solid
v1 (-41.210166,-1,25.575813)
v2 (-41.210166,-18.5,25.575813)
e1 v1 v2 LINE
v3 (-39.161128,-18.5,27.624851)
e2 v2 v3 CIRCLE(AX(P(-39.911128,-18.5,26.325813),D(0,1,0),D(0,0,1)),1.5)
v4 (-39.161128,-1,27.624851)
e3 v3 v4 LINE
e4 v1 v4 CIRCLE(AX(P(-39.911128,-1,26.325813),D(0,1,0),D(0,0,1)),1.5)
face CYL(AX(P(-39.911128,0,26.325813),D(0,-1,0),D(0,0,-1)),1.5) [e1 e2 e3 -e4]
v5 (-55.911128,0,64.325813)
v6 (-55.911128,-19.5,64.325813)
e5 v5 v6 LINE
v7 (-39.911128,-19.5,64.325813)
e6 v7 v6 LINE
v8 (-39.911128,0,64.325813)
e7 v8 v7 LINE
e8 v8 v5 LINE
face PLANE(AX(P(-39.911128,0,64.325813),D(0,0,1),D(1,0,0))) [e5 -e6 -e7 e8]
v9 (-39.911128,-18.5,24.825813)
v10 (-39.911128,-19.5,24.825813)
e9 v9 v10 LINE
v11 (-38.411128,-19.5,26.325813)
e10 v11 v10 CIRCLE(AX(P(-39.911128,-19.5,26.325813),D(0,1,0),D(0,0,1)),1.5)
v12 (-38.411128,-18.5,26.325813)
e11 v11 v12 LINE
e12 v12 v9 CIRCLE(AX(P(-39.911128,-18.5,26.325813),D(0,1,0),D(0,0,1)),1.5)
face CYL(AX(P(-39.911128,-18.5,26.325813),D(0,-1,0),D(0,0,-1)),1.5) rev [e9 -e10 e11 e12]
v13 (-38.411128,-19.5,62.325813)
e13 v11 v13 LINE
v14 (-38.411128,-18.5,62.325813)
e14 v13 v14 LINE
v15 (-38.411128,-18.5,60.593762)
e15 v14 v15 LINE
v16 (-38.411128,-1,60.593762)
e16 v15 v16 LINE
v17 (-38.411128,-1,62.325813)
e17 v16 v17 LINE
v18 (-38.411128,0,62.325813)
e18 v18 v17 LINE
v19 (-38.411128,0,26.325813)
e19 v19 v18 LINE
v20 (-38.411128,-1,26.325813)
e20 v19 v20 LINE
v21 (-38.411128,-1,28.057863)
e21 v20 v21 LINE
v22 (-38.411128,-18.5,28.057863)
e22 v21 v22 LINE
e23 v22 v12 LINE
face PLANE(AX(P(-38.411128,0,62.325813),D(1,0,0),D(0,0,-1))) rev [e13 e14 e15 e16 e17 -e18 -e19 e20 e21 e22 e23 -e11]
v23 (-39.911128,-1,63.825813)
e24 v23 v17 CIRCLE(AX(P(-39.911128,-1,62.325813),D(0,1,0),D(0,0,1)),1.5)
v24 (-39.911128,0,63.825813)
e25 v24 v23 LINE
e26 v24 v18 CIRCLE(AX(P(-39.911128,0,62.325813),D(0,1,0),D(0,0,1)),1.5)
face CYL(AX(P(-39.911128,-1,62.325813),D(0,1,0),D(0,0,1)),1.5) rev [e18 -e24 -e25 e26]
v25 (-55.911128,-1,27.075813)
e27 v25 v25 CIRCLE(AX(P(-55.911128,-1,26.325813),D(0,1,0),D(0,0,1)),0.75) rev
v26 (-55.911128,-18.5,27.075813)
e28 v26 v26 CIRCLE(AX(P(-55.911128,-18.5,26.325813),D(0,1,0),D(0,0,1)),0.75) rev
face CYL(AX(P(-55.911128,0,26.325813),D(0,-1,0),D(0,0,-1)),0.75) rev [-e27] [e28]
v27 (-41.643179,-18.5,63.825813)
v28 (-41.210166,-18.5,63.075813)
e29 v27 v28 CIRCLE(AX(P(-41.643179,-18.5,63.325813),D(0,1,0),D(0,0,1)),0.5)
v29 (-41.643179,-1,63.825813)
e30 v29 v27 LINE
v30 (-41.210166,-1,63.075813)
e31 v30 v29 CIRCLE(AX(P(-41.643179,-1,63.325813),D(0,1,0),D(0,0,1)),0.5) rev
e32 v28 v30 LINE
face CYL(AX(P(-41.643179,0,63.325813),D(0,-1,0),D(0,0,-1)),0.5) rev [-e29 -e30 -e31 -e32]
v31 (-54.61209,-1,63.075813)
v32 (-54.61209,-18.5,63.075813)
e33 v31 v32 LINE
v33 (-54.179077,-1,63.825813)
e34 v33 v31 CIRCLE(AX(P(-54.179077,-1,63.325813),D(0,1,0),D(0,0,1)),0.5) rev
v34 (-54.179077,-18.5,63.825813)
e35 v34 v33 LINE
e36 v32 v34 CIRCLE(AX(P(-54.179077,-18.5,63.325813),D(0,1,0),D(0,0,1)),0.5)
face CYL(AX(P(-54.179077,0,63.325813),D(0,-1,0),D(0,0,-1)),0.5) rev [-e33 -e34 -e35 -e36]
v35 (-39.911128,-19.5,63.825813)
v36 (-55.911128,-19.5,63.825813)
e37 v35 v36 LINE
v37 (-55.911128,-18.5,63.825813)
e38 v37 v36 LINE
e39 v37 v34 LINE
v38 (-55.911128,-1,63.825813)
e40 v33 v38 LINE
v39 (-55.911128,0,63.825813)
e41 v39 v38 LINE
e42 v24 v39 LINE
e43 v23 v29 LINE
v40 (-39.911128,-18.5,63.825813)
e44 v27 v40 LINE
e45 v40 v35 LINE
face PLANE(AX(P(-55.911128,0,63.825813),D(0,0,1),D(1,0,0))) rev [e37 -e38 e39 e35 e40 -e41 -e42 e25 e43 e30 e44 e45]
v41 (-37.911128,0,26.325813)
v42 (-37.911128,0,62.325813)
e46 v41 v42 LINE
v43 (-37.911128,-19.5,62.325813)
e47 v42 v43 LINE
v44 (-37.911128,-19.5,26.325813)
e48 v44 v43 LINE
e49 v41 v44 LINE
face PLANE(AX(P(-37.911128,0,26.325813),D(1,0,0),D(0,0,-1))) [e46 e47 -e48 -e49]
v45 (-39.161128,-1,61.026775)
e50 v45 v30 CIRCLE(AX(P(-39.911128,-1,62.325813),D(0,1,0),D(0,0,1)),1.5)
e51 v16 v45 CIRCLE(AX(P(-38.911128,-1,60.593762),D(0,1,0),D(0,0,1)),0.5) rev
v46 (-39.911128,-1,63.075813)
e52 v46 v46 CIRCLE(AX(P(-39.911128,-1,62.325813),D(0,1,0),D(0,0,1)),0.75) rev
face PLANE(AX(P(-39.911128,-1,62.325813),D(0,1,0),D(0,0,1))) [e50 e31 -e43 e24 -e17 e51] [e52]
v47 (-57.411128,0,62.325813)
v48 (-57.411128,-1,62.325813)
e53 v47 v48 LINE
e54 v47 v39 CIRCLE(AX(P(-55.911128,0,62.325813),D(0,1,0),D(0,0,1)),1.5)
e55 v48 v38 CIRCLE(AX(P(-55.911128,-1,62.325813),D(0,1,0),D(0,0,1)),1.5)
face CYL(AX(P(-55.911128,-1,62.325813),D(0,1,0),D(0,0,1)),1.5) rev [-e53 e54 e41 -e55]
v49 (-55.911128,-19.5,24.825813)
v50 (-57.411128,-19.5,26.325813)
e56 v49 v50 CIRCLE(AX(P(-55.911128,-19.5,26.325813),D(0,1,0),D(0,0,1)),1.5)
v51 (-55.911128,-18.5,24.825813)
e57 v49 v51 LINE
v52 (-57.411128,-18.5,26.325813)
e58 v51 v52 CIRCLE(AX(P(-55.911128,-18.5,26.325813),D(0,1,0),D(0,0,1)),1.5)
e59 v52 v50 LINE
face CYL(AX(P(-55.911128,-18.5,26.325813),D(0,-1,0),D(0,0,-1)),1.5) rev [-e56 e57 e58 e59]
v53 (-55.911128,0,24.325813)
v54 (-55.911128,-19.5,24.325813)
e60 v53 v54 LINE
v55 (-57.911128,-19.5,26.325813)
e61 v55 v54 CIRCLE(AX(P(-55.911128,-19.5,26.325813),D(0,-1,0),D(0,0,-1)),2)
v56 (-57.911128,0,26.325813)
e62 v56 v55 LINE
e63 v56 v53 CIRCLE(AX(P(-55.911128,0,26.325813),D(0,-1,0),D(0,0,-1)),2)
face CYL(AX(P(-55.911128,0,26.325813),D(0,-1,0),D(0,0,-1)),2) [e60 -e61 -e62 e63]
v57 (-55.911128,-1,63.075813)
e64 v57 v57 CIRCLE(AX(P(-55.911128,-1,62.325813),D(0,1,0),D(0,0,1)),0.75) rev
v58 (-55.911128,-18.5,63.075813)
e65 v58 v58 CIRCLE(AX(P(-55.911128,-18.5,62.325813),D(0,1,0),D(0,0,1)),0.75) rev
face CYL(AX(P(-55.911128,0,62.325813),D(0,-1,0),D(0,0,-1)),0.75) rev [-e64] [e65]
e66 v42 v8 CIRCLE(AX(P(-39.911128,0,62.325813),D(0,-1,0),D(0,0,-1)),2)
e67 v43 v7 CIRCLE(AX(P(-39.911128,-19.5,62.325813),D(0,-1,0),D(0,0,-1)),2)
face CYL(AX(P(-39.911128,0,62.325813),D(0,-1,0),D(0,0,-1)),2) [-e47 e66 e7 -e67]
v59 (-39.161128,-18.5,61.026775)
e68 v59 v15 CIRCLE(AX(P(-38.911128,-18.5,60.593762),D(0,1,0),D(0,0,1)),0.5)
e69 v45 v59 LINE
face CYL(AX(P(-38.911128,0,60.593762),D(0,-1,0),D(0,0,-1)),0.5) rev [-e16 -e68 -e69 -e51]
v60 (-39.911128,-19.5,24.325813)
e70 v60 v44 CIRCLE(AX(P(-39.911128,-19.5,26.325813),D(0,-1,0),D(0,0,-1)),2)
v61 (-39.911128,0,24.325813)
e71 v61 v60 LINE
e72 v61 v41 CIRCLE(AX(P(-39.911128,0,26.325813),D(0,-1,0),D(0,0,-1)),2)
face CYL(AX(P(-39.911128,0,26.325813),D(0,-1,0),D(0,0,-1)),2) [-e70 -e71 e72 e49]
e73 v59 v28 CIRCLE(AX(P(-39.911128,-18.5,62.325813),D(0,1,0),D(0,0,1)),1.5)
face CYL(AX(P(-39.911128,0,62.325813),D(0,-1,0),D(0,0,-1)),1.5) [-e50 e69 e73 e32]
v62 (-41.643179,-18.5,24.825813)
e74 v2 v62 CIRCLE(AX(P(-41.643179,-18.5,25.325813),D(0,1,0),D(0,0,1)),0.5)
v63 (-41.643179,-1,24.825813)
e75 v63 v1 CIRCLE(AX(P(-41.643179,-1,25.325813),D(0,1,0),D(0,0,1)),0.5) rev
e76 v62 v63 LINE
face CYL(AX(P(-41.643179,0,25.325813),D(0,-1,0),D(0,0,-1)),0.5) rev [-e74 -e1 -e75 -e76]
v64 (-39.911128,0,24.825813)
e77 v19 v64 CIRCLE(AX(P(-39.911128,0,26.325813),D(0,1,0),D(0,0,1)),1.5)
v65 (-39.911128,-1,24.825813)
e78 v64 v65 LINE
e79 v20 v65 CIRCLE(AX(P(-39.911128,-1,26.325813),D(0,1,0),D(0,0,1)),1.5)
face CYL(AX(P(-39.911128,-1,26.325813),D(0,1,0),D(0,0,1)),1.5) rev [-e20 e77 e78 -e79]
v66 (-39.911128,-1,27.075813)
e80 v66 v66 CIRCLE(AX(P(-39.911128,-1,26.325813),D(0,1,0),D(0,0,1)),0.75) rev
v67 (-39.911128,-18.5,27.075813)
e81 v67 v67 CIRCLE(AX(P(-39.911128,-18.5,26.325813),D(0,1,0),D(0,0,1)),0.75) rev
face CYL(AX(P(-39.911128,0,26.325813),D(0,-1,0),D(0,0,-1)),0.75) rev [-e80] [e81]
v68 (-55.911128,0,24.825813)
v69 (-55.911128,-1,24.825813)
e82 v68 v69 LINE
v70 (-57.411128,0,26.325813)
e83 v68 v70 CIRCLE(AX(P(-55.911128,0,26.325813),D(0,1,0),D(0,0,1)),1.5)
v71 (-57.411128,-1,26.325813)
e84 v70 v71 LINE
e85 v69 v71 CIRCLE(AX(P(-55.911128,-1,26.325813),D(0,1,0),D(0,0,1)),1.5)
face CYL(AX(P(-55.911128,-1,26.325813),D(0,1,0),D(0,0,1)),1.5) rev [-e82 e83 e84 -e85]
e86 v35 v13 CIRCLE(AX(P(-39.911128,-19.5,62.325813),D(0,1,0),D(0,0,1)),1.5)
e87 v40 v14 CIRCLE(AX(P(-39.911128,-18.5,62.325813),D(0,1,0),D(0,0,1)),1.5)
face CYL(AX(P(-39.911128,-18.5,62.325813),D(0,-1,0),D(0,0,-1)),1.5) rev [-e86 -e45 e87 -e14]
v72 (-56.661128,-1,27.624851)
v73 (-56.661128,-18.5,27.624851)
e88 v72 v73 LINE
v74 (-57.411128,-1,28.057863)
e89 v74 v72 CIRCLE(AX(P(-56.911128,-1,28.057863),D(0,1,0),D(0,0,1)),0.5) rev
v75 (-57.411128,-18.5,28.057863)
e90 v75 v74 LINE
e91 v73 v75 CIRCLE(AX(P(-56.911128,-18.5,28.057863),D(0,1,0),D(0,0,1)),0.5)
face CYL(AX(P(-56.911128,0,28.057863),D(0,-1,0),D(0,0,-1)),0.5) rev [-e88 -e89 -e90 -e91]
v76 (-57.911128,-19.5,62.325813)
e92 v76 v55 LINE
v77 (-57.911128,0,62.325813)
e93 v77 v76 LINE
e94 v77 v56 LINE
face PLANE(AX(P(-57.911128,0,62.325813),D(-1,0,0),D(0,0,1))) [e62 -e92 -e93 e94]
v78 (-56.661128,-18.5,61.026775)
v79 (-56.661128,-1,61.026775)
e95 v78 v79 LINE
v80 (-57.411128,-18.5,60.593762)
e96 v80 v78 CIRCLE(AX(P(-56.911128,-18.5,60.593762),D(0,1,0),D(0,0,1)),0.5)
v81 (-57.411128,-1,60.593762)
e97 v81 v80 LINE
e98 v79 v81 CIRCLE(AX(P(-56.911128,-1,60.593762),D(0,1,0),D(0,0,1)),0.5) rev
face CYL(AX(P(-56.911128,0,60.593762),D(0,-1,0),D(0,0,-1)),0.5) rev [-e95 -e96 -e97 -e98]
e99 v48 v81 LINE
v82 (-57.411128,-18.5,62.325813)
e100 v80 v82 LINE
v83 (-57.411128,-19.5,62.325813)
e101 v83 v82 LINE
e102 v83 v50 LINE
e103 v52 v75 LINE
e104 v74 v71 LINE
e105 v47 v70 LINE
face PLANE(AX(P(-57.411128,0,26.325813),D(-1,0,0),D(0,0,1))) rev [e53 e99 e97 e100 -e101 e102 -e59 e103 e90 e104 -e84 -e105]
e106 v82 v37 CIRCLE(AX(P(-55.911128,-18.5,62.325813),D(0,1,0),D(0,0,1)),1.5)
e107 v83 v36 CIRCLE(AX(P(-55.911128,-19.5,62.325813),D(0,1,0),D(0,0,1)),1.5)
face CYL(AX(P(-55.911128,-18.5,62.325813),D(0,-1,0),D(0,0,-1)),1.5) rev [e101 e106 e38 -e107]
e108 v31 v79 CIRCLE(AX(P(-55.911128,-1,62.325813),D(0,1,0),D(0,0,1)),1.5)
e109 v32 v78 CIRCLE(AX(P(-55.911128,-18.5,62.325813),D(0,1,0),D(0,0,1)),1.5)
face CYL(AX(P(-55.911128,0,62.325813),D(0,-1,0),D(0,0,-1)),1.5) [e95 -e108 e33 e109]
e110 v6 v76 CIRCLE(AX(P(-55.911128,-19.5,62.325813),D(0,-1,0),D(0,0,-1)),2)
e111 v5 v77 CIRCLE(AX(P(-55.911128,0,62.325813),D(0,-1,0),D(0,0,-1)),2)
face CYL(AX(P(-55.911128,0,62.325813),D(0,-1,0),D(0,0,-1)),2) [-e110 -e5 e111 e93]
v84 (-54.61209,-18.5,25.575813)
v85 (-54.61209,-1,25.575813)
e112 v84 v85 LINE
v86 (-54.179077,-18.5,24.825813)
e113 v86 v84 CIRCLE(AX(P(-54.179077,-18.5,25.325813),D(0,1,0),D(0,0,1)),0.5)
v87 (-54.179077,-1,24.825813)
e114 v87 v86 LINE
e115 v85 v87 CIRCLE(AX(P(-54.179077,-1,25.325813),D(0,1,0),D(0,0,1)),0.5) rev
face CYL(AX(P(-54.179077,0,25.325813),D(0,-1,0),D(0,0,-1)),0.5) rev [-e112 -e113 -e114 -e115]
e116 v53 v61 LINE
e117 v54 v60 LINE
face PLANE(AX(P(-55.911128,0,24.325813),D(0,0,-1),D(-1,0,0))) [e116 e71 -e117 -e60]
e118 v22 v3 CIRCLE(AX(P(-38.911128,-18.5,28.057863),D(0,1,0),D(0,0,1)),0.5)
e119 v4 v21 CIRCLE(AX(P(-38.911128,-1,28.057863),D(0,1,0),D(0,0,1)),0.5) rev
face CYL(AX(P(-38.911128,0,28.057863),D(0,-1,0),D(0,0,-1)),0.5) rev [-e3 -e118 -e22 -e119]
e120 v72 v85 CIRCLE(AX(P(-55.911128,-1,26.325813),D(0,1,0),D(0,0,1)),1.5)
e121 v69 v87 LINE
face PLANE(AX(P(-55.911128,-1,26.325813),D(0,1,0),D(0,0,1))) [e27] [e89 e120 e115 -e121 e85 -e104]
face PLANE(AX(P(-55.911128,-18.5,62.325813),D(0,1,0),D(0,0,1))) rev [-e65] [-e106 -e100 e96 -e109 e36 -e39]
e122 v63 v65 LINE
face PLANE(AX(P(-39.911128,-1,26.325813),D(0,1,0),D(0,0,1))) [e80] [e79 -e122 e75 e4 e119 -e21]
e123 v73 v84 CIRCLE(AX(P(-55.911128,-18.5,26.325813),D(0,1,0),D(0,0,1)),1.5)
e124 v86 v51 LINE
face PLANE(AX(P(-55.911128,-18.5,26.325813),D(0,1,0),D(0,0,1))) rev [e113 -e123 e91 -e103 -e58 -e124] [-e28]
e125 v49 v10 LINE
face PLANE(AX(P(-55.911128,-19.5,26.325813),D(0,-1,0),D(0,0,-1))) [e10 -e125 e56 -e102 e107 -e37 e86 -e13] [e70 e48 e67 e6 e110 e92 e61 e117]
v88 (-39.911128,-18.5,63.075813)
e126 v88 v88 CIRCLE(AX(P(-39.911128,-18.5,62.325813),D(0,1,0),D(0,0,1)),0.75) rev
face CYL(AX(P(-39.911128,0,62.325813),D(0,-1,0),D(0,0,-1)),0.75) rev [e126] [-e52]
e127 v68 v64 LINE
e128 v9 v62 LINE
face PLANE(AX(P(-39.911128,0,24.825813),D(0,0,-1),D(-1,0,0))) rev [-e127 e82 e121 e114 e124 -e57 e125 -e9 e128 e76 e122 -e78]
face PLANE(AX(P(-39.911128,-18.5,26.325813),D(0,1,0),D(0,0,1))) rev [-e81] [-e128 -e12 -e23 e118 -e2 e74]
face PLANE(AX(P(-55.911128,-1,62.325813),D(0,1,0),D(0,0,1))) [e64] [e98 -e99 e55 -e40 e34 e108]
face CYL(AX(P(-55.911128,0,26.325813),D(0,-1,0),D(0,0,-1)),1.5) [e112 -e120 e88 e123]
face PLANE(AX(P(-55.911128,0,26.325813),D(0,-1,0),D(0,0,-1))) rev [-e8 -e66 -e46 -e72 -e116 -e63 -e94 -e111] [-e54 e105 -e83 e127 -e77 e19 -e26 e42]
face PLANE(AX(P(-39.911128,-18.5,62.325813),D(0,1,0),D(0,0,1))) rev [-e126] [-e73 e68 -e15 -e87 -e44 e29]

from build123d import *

# Parameters (mm, degrees)
ESQUISSE1_R             = 0.7500000000000007
BOSS_EXTRU_1_DEPTH      = 19.5
ENL_V_START             = -1
ESQUISSE2_R             = 1.5000000000042053
ESQUISSE2_R_2           = 1.5000000000000118
ESQUISSE2_R_3           = 1.5000000000000042
ESQUISSE2_R_4           = 1.4999999999999973
ENL_V_MAT_EXTRU_1_DEPTH = 1
ENL_V_START_2           = -19.5
ESQUISSE2_2_R           = 1.5000000000042053
ESQUISSE2_2_R_2         = 1.5000000000000118
ESQUISSE2_2_R_3         = 1.5000000000000042
ESQUISSE2_2_R_4         = 1.4999999999999973
ENL_V_MAT_EXTRU_2_DEPTH = 1
CONG_1_R                = 0.5
CONG_2_START            = -18.5
CONG_2_DEPTH            = 17.5


with BuildPart() as part:
    # Esquisse1 → Boss.-Extru.1 (new body)
    with BuildSketch(Plane.XZ.offset(19.5)):
        with BuildLine():
            Line((-55.9111281070707, 24.325812619498315), (-39.91112810707456, 24.325812619498663))
            ThreePointArc((-39.91112810707456, 24.325812619498663), (-38.49691454470147, 24.911599057125567), (-37.91112810707456, 26.325812619498663))
            Line((-37.91112810707456, 26.325812619498663), (-37.91112810707456, 62.32581261950286))
            ThreePointArc((-37.91112810707456, 62.32581261950286), (-38.49691454470147, 63.740026181875955), (-39.91112810707456, 64.32581261950286))
            Line((-39.91112810707456, 64.32581261950286), (-55.91112810707387, 64.32581261950355))
            ThreePointArc((-55.91112810707387, 64.32581261950355), (-57.3253416694479, 63.74002618187669), (-57.91112810707526, 62.32581261950286))
            Line((-57.91112810707526, 62.32581261950286), (-57.91112810707456, 26.325812619502862))
            ThreePointArc((-57.91112810707456, 26.325812619502862), (-57.325341669446544, 24.911599057126917), (-55.9111281070707, 24.325812619498315))
        make_face()
        with Locations(Location((-39.91112810707456, 26.325812619498663, 0), (0, 0, 90))):
            Circle(ESQUISSE1_R, mode=Mode.SUBTRACT)
        with Locations(Location((-39.91112810707456, 62.32581261950286, 0), (0, 0, 90))):
            Circle(ESQUISSE1_R, mode=Mode.SUBTRACT)
        with Locations(Location((-55.91112810707456, 62.32581261950286, 0), (0, 0, 90))):
            Circle(ESQUISSE1_R, mode=Mode.SUBTRACT)
        with Locations(Location((-55.911128107070354, 26.325812619502862, 0), (0, 0, 90))):
            Circle(ESQUISSE1_R, mode=Mode.SUBTRACT)
        with BuildLine():
            Line((-38.41112810707456, 62.32581261950286), (-38.41112810707455, 26.325812619498663))
            ThreePointArc((-38.41112810707455, 26.325812619498663), (-40.97178827885439, 27.38647279127849), (-39.91112810707456, 24.825812619498656))
            Line((-39.91112810707456, 24.825812619498656), (-55.911128107070354, 24.825812619498652))
            ThreePointArc((-55.911128107070354, 24.825812619498652), (-54.850467935287554, 27.386472791285662), (-57.41112810707456, 26.325812619502862))
            Line((-57.41112810707456, 26.325812619502862), (-57.41112810707456, 62.32581261950286))
            ThreePointArc((-57.41112810707456, 62.32581261950286), (-54.85046793529474, 61.26515244772304), (-55.91112810707456, 63.82581261950286))
            Line((-55.91112810707456, 63.82581261950286), (-39.91112810707456, 63.82581261950286))
            ThreePointArc((-39.91112810707456, 63.82581261950286), (-40.97178827885438, 61.26515244772304), (-38.41112810707456, 62.32581261950286))
        make_face(mode=Mode.SUBTRACT)
    extrude(amount=-BOSS_EXTRU_1_DEPTH)

    # Esquisse2 → Enlèv. mat.-Extru.1 (cut)
    with BuildSketch(Plane(origin=(0, 0, 0), x_dir=(1, 0, 0), z_dir=(0, 1, 0)).offset(ENL_V_START)):
        with Locations((-55.911128107070354, -26.325812619502862)):
            Circle(ESQUISSE2_R)
        with Locations((-39.91112810707456, -26.325812619498663)):
            Circle(ESQUISSE2_R_2)
        with Locations((-55.91112810707456, -62.32581261950286)):
            Circle(ESQUISSE2_R_3)
        with Locations((-39.91112810707456, -62.32581261950286)):
            Circle(ESQUISSE2_R_4)
    extrude(amount=ENL_V_MAT_EXTRU_1_DEPTH, mode=Mode.SUBTRACT)

    # Esquisse2<2> → Enlèv. mat.-Extru.2 (cut)
    with BuildSketch(Plane(origin=(0, 0, 0), x_dir=(1, 0, 0), z_dir=(0, 1, 0)).offset(ENL_V_START_2)):
        with Locations((-55.911128107070354, -26.325812619502862)):
            Circle(ESQUISSE2_2_R)
        with Locations((-39.91112810707456, -26.325812619498663)):
            Circle(ESQUISSE2_2_R_2)
        with Locations((-55.91112810707456, -62.32581261950286)):
            Circle(ESQUISSE2_2_R_3)
        with Locations((-39.91112810707456, -62.32581261950286)):
            Circle(ESQUISSE2_2_R_4)
    extrude(amount=ENL_V_MAT_EXTRU_2_DEPTH, mode=Mode.SUBTRACT)

    # Congé1
    cong_1_edges = [part.edges().sort_by_distance(p)[0] for p in [
        (-57.41112810707456, -9.75, 26.325812619502862),
        (-38.41112810707456, -9.75, 26.325812619498663),
        (-57.41112810707456, -9.75, 62.32581261950286),
        (-38.41112810707456, -9.75, 62.32581261950286),
    ]]
    fillet(cong_1_edges, radius=CONG_1_R - 0.0001)  # a hair under: the kernel refuses the full size

    # Congé2: read off the stored shape, not the designer's step
    # Congé2 outline → Congé2 (add)
    with BuildSketch(Plane(origin=(0, 0, 0), x_dir=(1, 0, 0), z_dir=(0, 1, 0)).offset(CONG_2_START)):
        with BuildLine():
            ThreePointArc((-39.911128107, -63.82581262), (-40.661128107, -63.624850726), (-41.210166213, -63.07581262))
            ThreePointArc((-41.210166213, -63.07581262), (-41.210166213, -63.57581262), (-41.643178915, -63.82581262))
            Line((-41.643178915, -63.82581262), (-39.911128107, -63.82581262))
        make_face()
        with BuildLine():
            Line((-55.911128107, -63.82581262), (-54.1790773, -63.82581262))
            ThreePointArc((-54.1790773, -63.82581262), (-54.612090001, -63.57581262), (-54.612090001, -63.07581262))
            ThreePointArc((-54.612090001, -63.07581262), (-55.161128107, -63.624850725), (-55.911128107, -63.82581262))
        make_face()
        with BuildLine():
            Line((-39.911128107, -24.825812619), (-41.643178915, -24.825812619))
            ThreePointArc((-41.643178915, -24.825812619), (-41.210166213, -25.075812619), (-41.210166213, -25.575812619))
            ThreePointArc((-41.210166213, -25.575812619), (-40.661128107, -25.026774513), (-39.911128107, -24.825812619))
        make_face()
        with BuildLine():
            ThreePointArc((-54.612090001, -25.575812619), (-54.612090001, -25.075812619), (-54.179077299, -24.825812619))
            Line((-54.179077299, -24.825812619), (-55.911128107, -24.825812619))
            ThreePointArc((-55.911128107, -24.825812619), (-55.161128107, -25.026774514), (-54.612090001, -25.575812619))
        make_face()
    extrude(amount=CONG_2_DEPTH)


solid = part.part
